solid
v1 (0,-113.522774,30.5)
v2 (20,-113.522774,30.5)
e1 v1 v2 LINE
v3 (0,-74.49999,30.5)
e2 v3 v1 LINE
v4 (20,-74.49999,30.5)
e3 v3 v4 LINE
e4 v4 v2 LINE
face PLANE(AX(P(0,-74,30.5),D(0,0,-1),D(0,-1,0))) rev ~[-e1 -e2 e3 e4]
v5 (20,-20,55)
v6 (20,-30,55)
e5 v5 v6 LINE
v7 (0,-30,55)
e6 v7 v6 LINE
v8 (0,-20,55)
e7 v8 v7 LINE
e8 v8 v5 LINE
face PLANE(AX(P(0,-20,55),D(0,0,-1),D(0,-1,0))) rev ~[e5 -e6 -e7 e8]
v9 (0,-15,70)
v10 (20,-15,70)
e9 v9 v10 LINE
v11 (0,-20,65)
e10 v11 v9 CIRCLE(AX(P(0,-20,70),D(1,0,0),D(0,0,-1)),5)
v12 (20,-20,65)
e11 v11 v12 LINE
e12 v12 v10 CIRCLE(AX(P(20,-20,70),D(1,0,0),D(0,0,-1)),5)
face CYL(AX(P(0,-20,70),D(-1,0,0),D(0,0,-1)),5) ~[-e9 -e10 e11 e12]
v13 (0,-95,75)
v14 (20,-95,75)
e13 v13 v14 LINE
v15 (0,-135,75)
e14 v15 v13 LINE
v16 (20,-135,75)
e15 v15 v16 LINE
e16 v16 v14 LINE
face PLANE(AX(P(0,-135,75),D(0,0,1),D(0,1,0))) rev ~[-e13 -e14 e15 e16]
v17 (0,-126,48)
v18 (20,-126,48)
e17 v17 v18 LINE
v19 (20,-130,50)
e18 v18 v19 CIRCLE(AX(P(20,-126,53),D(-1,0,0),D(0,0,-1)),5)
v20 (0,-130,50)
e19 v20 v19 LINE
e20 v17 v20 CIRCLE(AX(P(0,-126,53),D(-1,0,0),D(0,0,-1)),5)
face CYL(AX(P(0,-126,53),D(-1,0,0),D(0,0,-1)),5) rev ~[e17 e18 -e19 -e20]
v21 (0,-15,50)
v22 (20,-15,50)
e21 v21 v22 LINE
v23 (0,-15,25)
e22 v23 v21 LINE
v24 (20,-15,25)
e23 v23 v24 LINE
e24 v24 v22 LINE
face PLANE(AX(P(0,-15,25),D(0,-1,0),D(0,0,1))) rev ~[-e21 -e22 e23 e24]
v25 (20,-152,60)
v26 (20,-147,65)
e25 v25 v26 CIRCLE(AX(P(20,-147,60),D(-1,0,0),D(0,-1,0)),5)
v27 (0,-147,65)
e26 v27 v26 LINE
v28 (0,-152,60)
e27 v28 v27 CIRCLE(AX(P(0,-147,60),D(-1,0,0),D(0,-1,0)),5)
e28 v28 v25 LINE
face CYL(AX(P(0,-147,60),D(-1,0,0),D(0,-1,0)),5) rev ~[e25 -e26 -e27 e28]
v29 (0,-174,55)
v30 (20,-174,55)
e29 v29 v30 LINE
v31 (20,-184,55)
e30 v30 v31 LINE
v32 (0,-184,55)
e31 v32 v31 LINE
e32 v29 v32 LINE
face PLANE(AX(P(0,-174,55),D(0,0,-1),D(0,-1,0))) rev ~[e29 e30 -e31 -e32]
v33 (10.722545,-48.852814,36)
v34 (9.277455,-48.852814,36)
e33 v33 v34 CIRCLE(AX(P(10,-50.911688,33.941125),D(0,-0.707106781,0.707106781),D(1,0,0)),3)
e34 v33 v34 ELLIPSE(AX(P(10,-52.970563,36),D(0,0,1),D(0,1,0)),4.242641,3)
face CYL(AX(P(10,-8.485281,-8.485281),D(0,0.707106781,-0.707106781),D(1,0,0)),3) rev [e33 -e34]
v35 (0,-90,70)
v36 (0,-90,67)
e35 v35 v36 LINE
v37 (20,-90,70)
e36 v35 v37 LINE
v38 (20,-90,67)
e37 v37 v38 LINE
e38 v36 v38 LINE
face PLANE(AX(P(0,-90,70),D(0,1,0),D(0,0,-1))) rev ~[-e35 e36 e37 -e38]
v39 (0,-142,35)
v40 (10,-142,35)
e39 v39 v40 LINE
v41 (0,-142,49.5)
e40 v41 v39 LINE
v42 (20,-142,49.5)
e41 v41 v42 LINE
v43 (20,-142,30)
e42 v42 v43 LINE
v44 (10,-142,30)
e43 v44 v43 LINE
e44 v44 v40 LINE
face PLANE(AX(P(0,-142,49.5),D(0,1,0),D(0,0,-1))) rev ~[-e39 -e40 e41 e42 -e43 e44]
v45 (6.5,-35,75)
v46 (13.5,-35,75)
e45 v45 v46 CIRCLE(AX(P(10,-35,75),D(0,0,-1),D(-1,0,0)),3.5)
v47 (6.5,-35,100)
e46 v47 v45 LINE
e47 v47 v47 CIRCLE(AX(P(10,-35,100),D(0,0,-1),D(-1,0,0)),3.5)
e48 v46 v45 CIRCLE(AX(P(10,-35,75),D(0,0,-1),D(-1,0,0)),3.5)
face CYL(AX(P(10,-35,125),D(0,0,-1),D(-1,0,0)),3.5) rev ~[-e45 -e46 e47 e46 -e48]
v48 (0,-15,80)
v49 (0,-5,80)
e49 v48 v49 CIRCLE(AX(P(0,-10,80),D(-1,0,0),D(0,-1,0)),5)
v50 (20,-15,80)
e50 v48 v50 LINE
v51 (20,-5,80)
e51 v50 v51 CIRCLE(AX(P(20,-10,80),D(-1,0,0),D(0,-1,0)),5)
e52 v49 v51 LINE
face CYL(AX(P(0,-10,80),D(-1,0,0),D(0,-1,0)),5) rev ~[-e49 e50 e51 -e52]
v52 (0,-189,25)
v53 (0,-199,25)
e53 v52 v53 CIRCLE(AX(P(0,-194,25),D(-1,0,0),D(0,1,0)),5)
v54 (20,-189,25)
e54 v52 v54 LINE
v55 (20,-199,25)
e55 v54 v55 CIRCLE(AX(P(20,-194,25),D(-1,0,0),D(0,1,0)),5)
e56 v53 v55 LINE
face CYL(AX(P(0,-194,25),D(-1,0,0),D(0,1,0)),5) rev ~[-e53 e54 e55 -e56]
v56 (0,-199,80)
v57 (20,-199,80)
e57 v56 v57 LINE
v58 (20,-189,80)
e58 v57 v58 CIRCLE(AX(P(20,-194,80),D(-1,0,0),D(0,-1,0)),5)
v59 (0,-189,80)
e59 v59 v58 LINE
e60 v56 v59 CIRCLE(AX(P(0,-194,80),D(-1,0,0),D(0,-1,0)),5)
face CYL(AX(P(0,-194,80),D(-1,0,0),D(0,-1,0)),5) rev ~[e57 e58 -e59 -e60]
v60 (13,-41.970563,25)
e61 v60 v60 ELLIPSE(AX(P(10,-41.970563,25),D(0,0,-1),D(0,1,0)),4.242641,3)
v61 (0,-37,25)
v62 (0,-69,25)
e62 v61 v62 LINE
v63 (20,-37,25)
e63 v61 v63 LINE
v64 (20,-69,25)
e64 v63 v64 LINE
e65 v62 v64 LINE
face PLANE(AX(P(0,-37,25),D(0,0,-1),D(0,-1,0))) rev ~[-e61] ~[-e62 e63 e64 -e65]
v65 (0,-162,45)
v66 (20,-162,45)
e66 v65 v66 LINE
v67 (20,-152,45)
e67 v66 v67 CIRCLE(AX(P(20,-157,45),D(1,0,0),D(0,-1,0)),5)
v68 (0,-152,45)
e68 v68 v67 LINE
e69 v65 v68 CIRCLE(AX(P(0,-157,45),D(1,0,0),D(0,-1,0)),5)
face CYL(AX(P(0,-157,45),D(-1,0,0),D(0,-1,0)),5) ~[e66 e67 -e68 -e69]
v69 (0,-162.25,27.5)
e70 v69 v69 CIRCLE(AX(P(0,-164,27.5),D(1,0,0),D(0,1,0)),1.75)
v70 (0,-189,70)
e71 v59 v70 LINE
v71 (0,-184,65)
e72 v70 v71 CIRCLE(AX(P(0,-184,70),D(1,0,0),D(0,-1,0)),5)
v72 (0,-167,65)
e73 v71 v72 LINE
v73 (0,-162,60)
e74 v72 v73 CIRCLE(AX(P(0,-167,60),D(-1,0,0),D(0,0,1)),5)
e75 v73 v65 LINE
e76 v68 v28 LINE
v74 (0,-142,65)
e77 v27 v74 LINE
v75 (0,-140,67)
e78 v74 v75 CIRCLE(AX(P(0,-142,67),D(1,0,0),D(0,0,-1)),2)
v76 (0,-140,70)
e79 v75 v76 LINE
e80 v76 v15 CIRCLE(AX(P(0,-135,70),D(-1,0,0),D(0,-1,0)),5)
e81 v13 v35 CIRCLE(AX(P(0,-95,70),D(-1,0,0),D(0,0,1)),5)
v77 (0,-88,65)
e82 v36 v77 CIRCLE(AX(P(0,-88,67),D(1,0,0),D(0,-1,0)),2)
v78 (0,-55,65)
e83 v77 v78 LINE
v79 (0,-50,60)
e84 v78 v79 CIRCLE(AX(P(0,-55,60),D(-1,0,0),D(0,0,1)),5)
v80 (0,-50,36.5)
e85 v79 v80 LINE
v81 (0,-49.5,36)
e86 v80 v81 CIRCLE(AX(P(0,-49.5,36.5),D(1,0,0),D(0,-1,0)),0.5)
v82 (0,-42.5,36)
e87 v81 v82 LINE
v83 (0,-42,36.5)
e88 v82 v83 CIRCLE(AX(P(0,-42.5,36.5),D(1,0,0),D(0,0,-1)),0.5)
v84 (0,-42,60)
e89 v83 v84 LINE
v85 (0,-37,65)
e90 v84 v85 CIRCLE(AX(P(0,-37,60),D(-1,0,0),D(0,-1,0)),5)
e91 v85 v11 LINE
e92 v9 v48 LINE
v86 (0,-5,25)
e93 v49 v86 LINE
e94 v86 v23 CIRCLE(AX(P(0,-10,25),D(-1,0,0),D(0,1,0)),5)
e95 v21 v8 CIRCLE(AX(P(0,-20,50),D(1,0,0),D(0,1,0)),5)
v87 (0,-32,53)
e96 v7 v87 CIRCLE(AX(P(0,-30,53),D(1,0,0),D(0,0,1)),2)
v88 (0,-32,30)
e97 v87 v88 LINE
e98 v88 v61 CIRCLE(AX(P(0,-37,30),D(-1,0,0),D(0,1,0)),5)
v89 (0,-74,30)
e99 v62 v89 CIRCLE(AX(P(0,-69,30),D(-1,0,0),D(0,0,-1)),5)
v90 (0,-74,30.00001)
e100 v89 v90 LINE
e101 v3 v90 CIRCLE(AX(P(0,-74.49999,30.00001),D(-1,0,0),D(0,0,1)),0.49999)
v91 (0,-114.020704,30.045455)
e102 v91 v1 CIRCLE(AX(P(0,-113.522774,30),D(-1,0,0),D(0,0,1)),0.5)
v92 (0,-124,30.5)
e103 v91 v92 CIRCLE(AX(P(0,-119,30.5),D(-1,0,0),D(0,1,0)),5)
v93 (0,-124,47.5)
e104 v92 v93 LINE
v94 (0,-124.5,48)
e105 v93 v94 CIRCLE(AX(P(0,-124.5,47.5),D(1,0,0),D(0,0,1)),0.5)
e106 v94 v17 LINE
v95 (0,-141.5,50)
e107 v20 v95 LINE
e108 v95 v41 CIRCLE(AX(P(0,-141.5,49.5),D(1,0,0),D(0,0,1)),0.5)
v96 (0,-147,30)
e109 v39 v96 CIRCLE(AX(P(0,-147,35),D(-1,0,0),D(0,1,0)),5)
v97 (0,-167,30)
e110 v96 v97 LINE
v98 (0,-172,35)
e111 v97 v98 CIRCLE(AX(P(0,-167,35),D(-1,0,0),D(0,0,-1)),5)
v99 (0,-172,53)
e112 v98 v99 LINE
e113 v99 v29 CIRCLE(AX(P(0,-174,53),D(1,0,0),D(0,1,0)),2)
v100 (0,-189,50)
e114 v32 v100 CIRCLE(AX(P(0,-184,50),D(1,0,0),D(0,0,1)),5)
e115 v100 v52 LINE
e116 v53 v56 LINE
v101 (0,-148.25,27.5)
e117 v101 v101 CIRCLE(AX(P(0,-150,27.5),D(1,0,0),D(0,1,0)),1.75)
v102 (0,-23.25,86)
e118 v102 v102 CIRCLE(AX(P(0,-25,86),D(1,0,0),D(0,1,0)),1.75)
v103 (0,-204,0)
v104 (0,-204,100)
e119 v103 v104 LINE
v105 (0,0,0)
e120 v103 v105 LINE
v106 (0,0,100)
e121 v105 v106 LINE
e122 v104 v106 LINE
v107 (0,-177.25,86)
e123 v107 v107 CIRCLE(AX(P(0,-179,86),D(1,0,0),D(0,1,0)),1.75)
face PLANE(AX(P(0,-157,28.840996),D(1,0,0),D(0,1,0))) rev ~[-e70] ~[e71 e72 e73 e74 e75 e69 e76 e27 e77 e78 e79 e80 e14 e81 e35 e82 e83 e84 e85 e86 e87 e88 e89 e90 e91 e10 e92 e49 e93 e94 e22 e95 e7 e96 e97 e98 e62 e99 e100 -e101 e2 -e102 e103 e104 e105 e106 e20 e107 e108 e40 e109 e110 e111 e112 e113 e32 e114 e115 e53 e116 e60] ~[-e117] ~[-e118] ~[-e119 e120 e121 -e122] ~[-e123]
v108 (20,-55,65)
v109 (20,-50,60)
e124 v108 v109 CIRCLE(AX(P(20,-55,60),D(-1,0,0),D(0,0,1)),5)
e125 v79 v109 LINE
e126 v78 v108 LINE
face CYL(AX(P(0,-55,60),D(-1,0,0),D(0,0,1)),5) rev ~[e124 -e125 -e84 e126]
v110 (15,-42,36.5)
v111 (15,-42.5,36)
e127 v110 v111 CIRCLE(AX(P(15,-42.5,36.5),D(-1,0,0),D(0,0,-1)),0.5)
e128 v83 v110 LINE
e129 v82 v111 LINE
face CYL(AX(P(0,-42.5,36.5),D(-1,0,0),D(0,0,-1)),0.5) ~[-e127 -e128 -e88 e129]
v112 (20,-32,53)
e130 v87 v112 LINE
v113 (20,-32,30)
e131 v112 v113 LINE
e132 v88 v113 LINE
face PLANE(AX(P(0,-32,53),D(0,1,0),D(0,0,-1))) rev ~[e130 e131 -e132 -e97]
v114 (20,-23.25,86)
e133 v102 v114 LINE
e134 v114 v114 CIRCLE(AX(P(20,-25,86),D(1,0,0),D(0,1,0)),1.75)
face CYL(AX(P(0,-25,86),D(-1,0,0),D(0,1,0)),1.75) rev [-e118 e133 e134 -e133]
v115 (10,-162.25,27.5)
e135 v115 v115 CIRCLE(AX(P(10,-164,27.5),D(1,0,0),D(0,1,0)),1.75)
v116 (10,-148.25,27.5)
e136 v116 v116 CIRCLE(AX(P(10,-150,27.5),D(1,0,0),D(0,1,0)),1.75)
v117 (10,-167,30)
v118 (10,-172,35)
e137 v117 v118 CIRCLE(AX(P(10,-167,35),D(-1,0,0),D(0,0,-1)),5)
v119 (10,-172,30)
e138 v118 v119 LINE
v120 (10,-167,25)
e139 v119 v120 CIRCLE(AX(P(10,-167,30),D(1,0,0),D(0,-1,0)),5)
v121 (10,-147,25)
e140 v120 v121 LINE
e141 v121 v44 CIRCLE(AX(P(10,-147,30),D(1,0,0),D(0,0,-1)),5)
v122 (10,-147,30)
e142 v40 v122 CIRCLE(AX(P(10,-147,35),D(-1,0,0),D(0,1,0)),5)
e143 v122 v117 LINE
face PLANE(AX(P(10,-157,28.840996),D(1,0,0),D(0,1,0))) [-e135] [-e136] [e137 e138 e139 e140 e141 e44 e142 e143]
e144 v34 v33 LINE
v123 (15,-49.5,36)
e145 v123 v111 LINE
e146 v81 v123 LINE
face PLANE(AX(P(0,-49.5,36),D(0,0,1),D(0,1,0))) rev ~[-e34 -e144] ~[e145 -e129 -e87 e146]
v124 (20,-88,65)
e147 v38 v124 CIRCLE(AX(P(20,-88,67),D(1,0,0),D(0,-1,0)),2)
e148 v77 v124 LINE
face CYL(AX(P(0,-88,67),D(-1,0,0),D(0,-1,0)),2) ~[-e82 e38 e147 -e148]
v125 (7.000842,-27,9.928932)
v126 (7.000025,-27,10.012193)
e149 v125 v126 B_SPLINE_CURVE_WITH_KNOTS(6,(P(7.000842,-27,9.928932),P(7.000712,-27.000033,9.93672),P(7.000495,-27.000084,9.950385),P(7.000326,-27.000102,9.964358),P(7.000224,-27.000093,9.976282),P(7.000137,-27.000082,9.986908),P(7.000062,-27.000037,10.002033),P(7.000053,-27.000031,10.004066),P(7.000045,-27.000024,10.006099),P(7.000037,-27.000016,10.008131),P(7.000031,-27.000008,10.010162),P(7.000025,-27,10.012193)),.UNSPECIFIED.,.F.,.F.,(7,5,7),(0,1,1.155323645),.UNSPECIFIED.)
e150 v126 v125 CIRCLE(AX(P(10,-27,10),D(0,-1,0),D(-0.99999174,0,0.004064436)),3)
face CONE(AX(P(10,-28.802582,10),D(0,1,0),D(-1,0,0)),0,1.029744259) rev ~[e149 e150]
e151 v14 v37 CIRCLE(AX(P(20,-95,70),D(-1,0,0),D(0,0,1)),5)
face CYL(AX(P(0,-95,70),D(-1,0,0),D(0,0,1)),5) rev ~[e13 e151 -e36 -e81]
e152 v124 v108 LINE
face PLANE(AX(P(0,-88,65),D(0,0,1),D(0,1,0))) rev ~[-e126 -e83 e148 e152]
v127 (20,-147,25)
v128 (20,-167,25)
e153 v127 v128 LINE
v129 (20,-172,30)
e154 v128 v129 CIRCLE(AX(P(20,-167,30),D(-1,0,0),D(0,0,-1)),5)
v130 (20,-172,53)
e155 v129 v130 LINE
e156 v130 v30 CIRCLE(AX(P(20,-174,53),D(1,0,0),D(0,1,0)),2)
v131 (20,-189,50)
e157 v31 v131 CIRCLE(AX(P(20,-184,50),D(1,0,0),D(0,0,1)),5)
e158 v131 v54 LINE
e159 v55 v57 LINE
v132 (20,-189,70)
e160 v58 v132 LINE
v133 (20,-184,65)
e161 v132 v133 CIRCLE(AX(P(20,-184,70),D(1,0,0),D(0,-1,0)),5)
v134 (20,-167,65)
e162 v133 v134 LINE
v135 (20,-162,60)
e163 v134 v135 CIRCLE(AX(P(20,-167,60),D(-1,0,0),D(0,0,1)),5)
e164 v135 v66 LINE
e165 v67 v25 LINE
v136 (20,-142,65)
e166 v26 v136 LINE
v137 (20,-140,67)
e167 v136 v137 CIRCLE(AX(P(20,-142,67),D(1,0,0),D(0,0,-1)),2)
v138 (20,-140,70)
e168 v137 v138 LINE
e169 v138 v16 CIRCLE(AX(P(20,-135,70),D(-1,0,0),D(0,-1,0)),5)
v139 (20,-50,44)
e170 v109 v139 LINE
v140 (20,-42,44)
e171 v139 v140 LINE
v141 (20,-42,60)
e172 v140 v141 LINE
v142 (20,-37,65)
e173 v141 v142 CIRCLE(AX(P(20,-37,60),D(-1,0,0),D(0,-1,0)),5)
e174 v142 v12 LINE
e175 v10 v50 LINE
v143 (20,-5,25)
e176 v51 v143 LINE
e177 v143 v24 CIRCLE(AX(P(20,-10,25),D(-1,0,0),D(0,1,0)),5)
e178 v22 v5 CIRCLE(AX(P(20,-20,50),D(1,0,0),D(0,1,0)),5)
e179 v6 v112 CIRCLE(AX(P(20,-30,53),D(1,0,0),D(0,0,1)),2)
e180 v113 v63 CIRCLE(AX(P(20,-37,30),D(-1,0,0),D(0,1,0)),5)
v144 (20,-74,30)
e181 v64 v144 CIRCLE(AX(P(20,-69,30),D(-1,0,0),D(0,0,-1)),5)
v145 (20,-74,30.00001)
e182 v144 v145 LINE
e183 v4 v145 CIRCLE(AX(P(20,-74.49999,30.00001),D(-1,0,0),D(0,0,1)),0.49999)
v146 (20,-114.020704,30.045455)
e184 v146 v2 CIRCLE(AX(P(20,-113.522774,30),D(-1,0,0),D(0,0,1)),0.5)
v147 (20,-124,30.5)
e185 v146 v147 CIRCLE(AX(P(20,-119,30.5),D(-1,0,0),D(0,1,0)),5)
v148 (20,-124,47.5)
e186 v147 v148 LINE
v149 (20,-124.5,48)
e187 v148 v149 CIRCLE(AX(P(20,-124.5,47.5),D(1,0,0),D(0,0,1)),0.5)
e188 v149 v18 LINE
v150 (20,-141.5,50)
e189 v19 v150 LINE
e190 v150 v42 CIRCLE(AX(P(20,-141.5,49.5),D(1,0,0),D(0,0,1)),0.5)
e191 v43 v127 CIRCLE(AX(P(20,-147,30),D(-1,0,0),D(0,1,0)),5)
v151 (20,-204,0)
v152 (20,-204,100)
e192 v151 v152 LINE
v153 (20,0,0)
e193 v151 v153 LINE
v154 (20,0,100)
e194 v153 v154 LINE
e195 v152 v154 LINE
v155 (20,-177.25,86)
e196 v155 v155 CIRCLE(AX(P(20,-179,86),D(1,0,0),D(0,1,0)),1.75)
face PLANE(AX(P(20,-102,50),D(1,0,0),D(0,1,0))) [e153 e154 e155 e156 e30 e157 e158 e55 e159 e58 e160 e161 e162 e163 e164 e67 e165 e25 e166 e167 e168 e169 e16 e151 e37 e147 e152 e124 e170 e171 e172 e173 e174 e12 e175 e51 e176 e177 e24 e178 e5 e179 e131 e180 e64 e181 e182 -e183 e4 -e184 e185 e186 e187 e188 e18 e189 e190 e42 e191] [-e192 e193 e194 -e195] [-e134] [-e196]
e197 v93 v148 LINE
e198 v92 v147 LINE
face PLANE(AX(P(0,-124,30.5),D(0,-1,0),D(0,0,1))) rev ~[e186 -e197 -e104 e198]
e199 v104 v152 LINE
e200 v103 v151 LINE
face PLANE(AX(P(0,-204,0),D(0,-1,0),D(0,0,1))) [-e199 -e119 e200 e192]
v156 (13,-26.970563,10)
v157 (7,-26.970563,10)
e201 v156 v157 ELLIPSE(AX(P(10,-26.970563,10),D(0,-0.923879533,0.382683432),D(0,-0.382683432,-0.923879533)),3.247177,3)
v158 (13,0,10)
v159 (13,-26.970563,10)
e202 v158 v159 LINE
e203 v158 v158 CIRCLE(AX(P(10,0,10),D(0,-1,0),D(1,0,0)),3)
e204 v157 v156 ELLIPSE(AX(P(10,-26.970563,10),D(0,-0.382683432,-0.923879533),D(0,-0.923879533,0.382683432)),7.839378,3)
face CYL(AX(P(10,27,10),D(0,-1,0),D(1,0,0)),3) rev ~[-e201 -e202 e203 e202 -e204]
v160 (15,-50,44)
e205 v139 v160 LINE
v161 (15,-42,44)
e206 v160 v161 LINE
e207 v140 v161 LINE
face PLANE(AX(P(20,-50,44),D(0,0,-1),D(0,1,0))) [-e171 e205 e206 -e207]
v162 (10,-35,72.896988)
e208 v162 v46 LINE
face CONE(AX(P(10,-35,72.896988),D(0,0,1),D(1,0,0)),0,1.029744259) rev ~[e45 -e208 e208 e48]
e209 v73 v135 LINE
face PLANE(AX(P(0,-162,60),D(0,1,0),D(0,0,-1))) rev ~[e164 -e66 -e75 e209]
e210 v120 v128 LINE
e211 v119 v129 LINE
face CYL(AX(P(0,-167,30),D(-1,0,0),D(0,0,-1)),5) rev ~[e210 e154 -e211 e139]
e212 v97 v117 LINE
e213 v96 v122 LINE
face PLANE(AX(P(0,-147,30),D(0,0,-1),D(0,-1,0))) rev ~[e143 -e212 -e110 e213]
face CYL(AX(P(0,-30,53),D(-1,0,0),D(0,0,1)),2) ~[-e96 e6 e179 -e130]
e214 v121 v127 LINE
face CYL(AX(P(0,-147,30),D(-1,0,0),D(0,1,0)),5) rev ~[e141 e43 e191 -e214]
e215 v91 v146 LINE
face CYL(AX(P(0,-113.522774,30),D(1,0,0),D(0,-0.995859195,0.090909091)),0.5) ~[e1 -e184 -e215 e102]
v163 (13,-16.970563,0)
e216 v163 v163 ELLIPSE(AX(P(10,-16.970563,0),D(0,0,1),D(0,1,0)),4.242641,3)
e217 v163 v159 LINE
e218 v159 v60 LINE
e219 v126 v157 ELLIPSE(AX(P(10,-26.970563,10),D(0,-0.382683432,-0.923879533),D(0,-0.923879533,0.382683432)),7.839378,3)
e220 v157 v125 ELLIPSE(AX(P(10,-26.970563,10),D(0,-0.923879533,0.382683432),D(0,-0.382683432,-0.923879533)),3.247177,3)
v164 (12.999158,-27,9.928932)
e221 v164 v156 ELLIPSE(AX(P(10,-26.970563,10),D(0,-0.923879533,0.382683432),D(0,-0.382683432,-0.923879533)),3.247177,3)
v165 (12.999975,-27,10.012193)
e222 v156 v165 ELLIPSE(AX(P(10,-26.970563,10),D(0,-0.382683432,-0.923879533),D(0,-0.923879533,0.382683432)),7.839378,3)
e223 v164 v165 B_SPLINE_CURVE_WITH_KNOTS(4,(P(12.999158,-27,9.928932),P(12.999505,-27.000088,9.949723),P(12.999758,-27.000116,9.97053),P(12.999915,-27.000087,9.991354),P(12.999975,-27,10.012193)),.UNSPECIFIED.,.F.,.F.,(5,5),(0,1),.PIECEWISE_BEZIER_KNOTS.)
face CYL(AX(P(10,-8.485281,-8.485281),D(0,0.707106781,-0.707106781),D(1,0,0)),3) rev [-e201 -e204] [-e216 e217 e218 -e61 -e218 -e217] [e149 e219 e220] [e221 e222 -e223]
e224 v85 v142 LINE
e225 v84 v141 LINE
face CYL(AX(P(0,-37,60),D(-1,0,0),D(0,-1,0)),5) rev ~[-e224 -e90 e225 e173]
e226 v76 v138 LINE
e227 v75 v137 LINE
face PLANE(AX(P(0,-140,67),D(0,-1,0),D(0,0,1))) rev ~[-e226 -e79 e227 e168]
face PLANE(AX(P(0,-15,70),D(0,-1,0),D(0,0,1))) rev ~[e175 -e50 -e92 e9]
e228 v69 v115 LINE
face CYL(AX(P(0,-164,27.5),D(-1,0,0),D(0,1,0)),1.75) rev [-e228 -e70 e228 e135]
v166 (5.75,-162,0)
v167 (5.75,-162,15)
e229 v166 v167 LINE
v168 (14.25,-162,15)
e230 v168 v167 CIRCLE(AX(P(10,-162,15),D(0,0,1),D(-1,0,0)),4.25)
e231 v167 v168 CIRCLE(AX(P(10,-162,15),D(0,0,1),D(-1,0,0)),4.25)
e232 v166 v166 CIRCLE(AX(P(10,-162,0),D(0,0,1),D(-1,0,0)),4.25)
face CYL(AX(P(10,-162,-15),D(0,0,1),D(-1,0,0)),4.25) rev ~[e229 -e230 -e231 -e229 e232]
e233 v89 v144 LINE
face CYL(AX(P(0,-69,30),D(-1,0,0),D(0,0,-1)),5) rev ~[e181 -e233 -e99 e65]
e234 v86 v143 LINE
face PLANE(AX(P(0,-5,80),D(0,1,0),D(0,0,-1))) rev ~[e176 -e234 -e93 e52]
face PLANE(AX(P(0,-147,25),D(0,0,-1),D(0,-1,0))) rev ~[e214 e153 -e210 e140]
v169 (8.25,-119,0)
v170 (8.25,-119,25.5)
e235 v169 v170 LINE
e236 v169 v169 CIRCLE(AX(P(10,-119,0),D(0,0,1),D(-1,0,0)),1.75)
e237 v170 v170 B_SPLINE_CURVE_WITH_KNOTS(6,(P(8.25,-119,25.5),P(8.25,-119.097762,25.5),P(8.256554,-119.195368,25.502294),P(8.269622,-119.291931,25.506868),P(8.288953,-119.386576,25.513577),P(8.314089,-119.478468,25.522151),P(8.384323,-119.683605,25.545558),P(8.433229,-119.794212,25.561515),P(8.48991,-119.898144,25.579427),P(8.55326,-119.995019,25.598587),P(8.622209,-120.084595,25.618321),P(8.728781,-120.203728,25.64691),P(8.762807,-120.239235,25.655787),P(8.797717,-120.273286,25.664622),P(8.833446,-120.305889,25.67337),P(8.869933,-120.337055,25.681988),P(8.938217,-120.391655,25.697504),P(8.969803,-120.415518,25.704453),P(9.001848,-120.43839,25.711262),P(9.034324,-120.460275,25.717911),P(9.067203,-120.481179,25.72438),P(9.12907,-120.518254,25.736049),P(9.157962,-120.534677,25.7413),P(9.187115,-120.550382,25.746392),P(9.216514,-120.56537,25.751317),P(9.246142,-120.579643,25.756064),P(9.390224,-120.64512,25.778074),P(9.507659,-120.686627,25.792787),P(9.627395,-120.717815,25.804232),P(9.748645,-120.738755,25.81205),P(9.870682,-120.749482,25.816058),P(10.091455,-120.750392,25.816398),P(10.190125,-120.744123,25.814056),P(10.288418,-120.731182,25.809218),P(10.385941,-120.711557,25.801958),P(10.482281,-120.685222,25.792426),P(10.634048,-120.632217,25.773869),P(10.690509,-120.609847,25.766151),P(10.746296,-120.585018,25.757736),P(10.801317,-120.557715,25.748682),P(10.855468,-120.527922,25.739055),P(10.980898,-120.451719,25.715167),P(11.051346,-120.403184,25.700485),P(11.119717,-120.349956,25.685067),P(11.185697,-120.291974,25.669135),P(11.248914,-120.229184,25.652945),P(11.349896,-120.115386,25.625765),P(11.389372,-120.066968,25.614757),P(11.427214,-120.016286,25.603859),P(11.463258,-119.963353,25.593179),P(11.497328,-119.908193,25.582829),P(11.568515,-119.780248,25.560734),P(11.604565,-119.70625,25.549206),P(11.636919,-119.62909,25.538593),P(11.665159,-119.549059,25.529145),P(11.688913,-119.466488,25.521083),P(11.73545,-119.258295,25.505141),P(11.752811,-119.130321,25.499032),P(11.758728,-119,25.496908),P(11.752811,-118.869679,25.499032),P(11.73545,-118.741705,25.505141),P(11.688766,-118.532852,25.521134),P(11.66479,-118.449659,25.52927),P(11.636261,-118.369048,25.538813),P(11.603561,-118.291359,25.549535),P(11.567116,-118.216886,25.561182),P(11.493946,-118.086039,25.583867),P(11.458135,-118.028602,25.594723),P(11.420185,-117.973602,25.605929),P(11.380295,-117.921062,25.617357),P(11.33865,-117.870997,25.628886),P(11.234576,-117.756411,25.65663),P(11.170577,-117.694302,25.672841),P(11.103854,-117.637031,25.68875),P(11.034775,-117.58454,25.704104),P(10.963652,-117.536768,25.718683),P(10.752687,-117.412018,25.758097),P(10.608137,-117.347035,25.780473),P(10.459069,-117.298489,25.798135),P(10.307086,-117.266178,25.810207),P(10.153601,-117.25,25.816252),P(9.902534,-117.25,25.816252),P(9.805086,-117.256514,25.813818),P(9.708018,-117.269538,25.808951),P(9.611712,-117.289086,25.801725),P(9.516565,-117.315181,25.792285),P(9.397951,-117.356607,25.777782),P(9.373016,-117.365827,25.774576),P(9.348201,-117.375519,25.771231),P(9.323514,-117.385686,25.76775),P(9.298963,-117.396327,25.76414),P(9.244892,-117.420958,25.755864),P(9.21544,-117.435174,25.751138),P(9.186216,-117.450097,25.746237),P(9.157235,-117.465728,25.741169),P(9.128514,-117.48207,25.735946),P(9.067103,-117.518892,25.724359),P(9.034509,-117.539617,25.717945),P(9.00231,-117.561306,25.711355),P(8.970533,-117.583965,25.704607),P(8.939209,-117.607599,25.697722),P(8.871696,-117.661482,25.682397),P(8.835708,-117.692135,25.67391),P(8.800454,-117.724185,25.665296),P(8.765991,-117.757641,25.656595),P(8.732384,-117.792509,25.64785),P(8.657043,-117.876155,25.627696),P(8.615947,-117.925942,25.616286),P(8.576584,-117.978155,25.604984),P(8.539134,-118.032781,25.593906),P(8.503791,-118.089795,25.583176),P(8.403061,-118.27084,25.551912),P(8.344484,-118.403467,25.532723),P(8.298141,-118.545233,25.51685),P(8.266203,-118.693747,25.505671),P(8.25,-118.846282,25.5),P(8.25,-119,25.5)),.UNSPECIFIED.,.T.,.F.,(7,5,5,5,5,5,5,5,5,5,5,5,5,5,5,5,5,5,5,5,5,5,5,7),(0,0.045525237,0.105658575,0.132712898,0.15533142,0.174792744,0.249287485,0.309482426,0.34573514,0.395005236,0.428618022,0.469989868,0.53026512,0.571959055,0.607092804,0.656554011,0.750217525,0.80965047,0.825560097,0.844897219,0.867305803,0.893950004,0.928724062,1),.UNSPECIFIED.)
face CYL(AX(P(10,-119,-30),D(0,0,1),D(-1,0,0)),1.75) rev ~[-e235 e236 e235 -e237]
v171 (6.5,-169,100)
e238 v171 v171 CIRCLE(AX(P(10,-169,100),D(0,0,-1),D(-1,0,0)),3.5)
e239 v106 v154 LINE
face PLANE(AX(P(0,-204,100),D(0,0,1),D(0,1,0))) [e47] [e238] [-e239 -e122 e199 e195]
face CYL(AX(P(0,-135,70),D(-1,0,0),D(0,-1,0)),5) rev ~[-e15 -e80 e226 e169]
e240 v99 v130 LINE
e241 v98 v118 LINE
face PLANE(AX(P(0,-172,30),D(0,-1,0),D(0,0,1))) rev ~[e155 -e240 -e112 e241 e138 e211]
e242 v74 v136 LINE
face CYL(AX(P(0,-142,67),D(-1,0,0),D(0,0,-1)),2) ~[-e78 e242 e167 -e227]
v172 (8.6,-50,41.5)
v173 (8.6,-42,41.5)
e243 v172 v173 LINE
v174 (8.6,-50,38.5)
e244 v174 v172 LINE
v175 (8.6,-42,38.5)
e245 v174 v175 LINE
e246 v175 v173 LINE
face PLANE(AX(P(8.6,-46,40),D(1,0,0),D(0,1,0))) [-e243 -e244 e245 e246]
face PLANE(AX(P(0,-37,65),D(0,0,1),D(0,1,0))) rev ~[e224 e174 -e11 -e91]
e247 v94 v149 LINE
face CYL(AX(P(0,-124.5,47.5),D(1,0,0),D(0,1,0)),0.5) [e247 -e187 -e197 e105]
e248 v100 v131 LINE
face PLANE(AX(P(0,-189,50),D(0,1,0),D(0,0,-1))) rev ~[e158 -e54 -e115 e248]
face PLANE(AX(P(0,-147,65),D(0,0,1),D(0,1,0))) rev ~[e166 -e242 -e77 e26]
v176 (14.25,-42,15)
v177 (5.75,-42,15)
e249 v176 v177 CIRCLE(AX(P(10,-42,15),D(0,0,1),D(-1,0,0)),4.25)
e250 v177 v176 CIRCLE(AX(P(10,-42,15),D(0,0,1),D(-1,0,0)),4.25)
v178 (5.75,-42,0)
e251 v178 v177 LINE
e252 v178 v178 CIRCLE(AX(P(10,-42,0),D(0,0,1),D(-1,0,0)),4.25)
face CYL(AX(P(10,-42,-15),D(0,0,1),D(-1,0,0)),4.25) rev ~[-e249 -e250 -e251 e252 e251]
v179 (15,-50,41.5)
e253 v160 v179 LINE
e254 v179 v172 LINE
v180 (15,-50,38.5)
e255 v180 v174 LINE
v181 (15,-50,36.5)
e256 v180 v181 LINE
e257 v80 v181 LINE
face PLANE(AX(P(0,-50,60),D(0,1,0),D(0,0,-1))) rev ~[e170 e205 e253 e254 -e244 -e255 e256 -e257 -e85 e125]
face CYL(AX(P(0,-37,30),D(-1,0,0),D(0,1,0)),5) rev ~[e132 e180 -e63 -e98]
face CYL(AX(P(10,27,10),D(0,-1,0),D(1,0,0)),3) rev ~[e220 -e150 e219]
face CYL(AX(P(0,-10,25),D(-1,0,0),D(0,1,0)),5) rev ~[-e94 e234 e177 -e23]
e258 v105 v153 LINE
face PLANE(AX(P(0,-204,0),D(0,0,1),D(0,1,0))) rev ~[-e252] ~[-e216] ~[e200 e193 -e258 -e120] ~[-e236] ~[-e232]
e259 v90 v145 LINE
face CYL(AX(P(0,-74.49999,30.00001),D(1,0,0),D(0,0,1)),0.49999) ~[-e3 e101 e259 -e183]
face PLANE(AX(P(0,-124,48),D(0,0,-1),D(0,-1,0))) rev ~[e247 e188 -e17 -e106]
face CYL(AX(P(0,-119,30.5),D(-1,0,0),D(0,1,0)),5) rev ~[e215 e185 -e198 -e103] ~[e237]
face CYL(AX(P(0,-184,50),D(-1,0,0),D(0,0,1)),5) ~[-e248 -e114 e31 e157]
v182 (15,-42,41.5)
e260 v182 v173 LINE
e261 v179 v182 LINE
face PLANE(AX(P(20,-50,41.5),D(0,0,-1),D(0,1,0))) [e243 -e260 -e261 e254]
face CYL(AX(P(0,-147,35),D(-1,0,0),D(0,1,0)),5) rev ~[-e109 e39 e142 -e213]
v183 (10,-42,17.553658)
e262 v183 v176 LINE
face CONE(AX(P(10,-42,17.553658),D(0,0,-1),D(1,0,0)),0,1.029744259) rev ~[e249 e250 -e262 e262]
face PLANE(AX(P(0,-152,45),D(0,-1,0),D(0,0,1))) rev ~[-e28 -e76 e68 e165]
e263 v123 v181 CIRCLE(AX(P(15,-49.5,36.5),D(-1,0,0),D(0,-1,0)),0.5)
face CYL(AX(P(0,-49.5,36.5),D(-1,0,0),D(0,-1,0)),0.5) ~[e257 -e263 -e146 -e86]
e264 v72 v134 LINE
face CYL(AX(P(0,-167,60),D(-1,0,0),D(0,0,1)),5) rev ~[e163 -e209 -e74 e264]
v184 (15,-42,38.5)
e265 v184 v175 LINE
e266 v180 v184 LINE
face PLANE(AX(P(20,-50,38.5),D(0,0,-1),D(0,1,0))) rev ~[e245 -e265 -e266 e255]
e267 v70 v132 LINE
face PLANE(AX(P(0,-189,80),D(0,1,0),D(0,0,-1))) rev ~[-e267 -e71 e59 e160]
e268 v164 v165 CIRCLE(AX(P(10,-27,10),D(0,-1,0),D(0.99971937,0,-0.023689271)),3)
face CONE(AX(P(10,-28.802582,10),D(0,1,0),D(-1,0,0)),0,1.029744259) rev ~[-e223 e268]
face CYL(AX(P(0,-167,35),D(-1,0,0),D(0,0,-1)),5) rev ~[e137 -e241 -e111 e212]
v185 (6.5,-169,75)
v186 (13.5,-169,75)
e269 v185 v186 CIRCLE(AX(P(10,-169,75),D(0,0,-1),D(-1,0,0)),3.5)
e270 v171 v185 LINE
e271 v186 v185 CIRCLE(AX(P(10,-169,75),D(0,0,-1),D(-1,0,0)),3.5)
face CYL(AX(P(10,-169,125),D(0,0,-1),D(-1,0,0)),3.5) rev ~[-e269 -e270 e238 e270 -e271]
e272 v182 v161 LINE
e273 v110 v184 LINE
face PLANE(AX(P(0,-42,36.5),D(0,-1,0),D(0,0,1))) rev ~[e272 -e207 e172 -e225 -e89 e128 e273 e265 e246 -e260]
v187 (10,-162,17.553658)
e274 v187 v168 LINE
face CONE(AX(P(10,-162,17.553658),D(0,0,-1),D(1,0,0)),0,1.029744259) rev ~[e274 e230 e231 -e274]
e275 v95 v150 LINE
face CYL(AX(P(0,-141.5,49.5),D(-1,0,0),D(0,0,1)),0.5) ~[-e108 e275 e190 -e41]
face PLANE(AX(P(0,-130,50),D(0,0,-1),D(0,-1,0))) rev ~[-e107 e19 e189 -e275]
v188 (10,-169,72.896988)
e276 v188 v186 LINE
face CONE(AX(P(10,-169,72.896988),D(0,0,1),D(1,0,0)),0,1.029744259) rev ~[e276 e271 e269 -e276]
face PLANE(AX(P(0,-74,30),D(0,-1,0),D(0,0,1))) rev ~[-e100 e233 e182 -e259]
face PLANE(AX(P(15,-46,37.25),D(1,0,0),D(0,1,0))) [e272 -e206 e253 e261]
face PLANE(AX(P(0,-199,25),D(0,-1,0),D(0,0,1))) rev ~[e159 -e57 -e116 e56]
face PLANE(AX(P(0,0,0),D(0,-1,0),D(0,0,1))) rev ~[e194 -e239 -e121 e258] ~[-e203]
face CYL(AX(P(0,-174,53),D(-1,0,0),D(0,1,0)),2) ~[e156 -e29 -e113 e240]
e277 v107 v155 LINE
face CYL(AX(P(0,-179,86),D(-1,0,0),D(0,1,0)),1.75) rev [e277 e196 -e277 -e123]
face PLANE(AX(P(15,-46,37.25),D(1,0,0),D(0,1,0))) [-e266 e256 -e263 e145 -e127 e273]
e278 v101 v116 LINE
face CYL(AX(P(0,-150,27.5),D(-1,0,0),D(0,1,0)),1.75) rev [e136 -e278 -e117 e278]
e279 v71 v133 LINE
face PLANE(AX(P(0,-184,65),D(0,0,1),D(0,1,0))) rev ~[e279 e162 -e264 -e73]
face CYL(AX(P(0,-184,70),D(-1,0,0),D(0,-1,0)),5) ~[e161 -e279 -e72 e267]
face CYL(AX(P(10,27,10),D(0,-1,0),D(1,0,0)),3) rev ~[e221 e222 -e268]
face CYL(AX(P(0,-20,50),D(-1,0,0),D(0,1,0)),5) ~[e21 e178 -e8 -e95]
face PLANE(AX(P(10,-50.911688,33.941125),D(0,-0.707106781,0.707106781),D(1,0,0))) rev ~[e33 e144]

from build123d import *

# Parameters (mm, degrees)
F0_W      = 204
F0_H      = 100
F0_R      = 1.75
F1_DEPTH  = 20
F3_D      = 3.5
F3_DEPTH  = 30
F3_TIP    = 1.0515060833
F5_D      = 7
F5_DEPTH  = 25
F5_TIP    = 2.1030121666
F7_D      = 6
F7_DEPTH  = 27
F7_TIP    = 1.8025818571
F9_R      = 3
F10_DEPTH = 60
F12_D     = 8.5
F12_DEPTH = 15
F12_TIP   = 2.5536576309
F13_DEPTH = 10
F14_W     = 8
F14_H     = 2.5
F14_H_2   = 3
F15_DEPTH = 5
F16_DEPTH = 11.4
F17_R     = 0.5
F18_R     = 0.5
F19_R     = 0.49999


# Not quite as in the source:
# - a fillet or chamfer is up to 0.001 mm smaller than in the source, because OpenCascade refuses the exact size


with BuildPart() as f1:
    # F0 (on Right) → F1 (new body)
    with BuildSketch(Plane.YZ):
        with Locations((-102, 50)):
            Rectangle(F0_W, F0_H)
        with Locations((-179, 86)):
            Circle(F0_R, mode=Mode.SUBTRACT)
        with BuildLine():
            Line((-184, 65), (-167, 65))
            ThreePointArc((-167, 65), (-163.4644660941, 63.5355339059), (-162, 60))
            Line((-162, 60), (-162, 45))
            ThreePointArc((-162, 45), (-157, 40), (-152, 45))
            Line((-152, 45), (-152, 60))
            ThreePointArc((-152, 60), (-150.5355339059, 63.5355339059), (-147, 65))
            Line((-147, 65), (-142, 65))
            ThreePointArc((-142, 65), (-140.5857864376, 65.5857864376), (-140, 67))
            Line((-140, 67), (-140, 70))
            ThreePointArc((-140, 70), (-138.5355339059, 73.5355339059), (-135, 75))
            Line((-135, 75), (-95, 75))
            ThreePointArc((-95, 75), (-91.4644660941, 73.5355339059), (-90, 70))
            Line((-90, 70), (-90, 67))
            ThreePointArc((-90, 67), (-89.4142135624, 65.5857864376), (-88, 65))
            Line((-88, 65), (-55, 65))
            ThreePointArc((-55, 65), (-51.4644660941, 63.5355339059), (-50, 60))
            Line((-50, 60), (-50, 36.5))
            ThreePointArc((-50, 36.5), (-49.8535533906, 36.1464466094), (-49.5, 36))
            Line((-49.5, 36), (-42.5, 36))
            ThreePointArc((-42.5, 36), (-42.1464466094, 36.1464466094), (-42, 36.5))
            Line((-42, 36.5), (-42, 60))
            ThreePointArc((-42, 60), (-40.5355339059, 63.5355339059), (-37, 65))
            Line((-37, 65), (-20, 65))
            ThreePointArc((-20, 65), (-16.4644660941, 66.4644660941), (-15, 70))
            Line((-15, 70), (-15, 80))
            ThreePointArc((-15, 80), (-10, 85), (-5, 80))
            Line((-5, 80), (-5, 25))
            ThreePointArc((-5, 25), (-10, 20), (-15, 25))
            Line((-15, 25), (-15, 50))
            ThreePointArc((-15, 50), (-16.4644660941, 53.5355339059), (-20, 55))
            Line((-20, 55), (-30, 55))
            ThreePointArc((-30, 55), (-31.4142135624, 54.4142135624), (-32, 53))
            Line((-32, 53), (-32, 30))
            ThreePointArc((-32, 30), (-33.4644660941, 26.4644660941), (-37, 25))
            Line((-37, 25), (-69, 25))
            ThreePointArc((-69, 25), (-72.5355339059, 26.4644660941), (-74, 30))
            Line((-74, 30), (-74, 30.5))
            Line((-74, 30.5), (-114, 30.5))
            ThreePointArc((-114, 30.5), (-119, 25.5), (-124, 30.5))
            Line((-124, 30.5), (-124, 48))
            Line((-124, 48), (-126, 48))
            ThreePointArc((-126, 48), (-128.2360679775, 48.527864045), (-130, 50))
            Line((-130, 50), (-141.5, 50))
            ThreePointArc((-141.5, 50), (-141.8535533906, 49.8535533906), (-142, 49.5))
            Line((-142, 49.5), (-142, 35))
            Line((-142, 35), (-142, 30))
            ThreePointArc((-142, 30), (-143.4644660941, 26.4644660941), (-147, 25))
            Line((-147, 25), (-167, 25))
            ThreePointArc((-167, 25), (-170.5355339059, 26.4644660941), (-172, 30))
            Line((-172, 30), (-172, 35))
            Line((-172, 35), (-172, 53))
            ThreePointArc((-172, 53), (-172.5857864376, 54.4142135624), (-174, 55))
            Line((-174, 55), (-184, 55))
            ThreePointArc((-184, 55), (-187.5355339059, 53.5355339059), (-189, 50))
            Line((-189, 50), (-189, 25))
            ThreePointArc((-189, 25), (-194, 20), (-199, 25))
            Line((-199, 25), (-199, 80))
            ThreePointArc((-199, 80), (-194, 85), (-189, 80))
            Line((-189, 80), (-189, 70))
            ThreePointArc((-189, 70), (-187.5355339059, 66.4644660941), (-184, 65))
        make_face(mode=Mode.SUBTRACT)
        with Locations((-25, 86)):
            Circle(F0_R, mode=Mode.SUBTRACT)
    extrude(amount=F1_DEPTH)

    # F3
    with Locations(Plane(origin=(0, 0, 0), x_dir=(1, 0, 0), z_dir=(0, 0, -1))):
        with Locations((10, 119)):
            Hole(F3_D / 2, depth=F3_DEPTH)
            with Locations((0, 0, -(F3_DEPTH + F3_TIP / 2))):  # 118° drill point
                Cone(0, F3_D / 2, F3_TIP, mode=Mode.SUBTRACT)

    # F5
    with Locations(Plane.XY.offset(100)):
        with Locations((10, -169), (10, -35)):
            Hole(F5_D / 2, depth=F5_DEPTH)
            with Locations((0, 0, -(F5_DEPTH + F5_TIP / 2))):  # 118° drill point
                Cone(0, F5_D / 2, F5_TIP, mode=Mode.SUBTRACT)

    # F7
    with Locations(Plane(origin=(0, 0, 0), x_dir=(-1, 0, 0), z_dir=(0, 1, 0))):
        with Locations((-10, 10)):
            Hole(F7_D / 2, depth=F7_DEPTH)
            with Locations((0, 0, -(F7_DEPTH + F7_TIP / 2))):  # 118° drill point
                Cone(0, F7_D / 2, F7_TIP, mode=Mode.SUBTRACT)

    # F9 (on face) → F10 (cut)
    with BuildSketch(Plane(origin=(0, 0, 0), x_dir=(1, 0, 0), z_dir=(0, -0.7071067812, 0.7071067812))):
        with Locations((10, -12)):
            Circle(F9_R)
    extrude(amount=F10_DEPTH, mode=Mode.SUBTRACT)

    # F12
    with Locations(Plane(origin=(0, 0, 0), x_dir=(1, 0, 0), z_dir=(0, 0, -1))):
        with Locations((10, 162), (10, 42)):
            Hole(F12_D / 2, depth=F12_DEPTH)
            with Locations((0, 0, -(F12_DEPTH + F12_TIP / 2))):  # 118° drill point
                Cone(0, F12_D / 2, F12_TIP, mode=Mode.SUBTRACT)

    # F0 (on Right) → F13 (join)
    with BuildSketch(Plane.YZ):
        with BuildLine():
            ThreePointArc((-167, 30), (-170.5355339059, 31.4644660941), (-172, 35))
            Line((-172, 35), (-172, 30))
            ThreePointArc((-172, 30), (-170.5355339059, 26.4644660941), (-167, 25))
            Line((-167, 25), (-147, 25))
            ThreePointArc((-147, 25), (-143.4644660941, 26.4644660941), (-142, 30))
            Line((-142, 30), (-142, 35))
            ThreePointArc((-142, 35), (-143.4644660941, 31.4644660941), (-147, 30))
            Line((-147, 30), (-167, 30))
        make_face()
        with Locations((-164, 27.5)):
            Circle(F0_R, mode=Mode.SUBTRACT)
        with Locations((-150, 27.5)):
            Circle(F0_R, mode=Mode.SUBTRACT)
    extrude(amount=F13_DEPTH)

    # F14 (on face) → F15 (cut)
    with BuildSketch(Plane.YZ.offset(20)):
        with Locations((-46, 37.25)):
            Rectangle(F14_W, F14_H)
        with Locations((-46, 40)):
            Rectangle(F14_W, F14_H_2)
        with Locations((-46, 42.75)):
            Rectangle(F14_W, F14_H)
    extrude(amount=-F15_DEPTH, mode=Mode.SUBTRACT)

    # F14 (on face) → F16 (cut)
    with BuildSketch(Plane.YZ.offset(20)):
        with Locations((-46, 40)):
            Rectangle(F14_W, F14_H_2)
    extrude(amount=-F16_DEPTH, mode=Mode.SUBTRACT)

    # F17
    f17_edges = [f1.edges().sort_by_distance(p)[0] for p in [
        (10, -124, 48),
    ]]
    fillet(f17_edges, radius=F17_R)

    # F18
    f18_edges = [f1.edges().sort_by_distance(p)[0] for p in [
        (10, -114, 30.5),
    ]]
    fillet(f18_edges, radius=F18_R)

    # F19 (radius 0.5 in the source; OpenCascade refuses exactly that, so slightly less here)
    f19_edges = [f1.edges().sort_by_distance(p)[0] for p in [
        (10, -74, 30.5),
    ]]
    fillet(f19_edges, radius=F19_R)


solid = f1.part
